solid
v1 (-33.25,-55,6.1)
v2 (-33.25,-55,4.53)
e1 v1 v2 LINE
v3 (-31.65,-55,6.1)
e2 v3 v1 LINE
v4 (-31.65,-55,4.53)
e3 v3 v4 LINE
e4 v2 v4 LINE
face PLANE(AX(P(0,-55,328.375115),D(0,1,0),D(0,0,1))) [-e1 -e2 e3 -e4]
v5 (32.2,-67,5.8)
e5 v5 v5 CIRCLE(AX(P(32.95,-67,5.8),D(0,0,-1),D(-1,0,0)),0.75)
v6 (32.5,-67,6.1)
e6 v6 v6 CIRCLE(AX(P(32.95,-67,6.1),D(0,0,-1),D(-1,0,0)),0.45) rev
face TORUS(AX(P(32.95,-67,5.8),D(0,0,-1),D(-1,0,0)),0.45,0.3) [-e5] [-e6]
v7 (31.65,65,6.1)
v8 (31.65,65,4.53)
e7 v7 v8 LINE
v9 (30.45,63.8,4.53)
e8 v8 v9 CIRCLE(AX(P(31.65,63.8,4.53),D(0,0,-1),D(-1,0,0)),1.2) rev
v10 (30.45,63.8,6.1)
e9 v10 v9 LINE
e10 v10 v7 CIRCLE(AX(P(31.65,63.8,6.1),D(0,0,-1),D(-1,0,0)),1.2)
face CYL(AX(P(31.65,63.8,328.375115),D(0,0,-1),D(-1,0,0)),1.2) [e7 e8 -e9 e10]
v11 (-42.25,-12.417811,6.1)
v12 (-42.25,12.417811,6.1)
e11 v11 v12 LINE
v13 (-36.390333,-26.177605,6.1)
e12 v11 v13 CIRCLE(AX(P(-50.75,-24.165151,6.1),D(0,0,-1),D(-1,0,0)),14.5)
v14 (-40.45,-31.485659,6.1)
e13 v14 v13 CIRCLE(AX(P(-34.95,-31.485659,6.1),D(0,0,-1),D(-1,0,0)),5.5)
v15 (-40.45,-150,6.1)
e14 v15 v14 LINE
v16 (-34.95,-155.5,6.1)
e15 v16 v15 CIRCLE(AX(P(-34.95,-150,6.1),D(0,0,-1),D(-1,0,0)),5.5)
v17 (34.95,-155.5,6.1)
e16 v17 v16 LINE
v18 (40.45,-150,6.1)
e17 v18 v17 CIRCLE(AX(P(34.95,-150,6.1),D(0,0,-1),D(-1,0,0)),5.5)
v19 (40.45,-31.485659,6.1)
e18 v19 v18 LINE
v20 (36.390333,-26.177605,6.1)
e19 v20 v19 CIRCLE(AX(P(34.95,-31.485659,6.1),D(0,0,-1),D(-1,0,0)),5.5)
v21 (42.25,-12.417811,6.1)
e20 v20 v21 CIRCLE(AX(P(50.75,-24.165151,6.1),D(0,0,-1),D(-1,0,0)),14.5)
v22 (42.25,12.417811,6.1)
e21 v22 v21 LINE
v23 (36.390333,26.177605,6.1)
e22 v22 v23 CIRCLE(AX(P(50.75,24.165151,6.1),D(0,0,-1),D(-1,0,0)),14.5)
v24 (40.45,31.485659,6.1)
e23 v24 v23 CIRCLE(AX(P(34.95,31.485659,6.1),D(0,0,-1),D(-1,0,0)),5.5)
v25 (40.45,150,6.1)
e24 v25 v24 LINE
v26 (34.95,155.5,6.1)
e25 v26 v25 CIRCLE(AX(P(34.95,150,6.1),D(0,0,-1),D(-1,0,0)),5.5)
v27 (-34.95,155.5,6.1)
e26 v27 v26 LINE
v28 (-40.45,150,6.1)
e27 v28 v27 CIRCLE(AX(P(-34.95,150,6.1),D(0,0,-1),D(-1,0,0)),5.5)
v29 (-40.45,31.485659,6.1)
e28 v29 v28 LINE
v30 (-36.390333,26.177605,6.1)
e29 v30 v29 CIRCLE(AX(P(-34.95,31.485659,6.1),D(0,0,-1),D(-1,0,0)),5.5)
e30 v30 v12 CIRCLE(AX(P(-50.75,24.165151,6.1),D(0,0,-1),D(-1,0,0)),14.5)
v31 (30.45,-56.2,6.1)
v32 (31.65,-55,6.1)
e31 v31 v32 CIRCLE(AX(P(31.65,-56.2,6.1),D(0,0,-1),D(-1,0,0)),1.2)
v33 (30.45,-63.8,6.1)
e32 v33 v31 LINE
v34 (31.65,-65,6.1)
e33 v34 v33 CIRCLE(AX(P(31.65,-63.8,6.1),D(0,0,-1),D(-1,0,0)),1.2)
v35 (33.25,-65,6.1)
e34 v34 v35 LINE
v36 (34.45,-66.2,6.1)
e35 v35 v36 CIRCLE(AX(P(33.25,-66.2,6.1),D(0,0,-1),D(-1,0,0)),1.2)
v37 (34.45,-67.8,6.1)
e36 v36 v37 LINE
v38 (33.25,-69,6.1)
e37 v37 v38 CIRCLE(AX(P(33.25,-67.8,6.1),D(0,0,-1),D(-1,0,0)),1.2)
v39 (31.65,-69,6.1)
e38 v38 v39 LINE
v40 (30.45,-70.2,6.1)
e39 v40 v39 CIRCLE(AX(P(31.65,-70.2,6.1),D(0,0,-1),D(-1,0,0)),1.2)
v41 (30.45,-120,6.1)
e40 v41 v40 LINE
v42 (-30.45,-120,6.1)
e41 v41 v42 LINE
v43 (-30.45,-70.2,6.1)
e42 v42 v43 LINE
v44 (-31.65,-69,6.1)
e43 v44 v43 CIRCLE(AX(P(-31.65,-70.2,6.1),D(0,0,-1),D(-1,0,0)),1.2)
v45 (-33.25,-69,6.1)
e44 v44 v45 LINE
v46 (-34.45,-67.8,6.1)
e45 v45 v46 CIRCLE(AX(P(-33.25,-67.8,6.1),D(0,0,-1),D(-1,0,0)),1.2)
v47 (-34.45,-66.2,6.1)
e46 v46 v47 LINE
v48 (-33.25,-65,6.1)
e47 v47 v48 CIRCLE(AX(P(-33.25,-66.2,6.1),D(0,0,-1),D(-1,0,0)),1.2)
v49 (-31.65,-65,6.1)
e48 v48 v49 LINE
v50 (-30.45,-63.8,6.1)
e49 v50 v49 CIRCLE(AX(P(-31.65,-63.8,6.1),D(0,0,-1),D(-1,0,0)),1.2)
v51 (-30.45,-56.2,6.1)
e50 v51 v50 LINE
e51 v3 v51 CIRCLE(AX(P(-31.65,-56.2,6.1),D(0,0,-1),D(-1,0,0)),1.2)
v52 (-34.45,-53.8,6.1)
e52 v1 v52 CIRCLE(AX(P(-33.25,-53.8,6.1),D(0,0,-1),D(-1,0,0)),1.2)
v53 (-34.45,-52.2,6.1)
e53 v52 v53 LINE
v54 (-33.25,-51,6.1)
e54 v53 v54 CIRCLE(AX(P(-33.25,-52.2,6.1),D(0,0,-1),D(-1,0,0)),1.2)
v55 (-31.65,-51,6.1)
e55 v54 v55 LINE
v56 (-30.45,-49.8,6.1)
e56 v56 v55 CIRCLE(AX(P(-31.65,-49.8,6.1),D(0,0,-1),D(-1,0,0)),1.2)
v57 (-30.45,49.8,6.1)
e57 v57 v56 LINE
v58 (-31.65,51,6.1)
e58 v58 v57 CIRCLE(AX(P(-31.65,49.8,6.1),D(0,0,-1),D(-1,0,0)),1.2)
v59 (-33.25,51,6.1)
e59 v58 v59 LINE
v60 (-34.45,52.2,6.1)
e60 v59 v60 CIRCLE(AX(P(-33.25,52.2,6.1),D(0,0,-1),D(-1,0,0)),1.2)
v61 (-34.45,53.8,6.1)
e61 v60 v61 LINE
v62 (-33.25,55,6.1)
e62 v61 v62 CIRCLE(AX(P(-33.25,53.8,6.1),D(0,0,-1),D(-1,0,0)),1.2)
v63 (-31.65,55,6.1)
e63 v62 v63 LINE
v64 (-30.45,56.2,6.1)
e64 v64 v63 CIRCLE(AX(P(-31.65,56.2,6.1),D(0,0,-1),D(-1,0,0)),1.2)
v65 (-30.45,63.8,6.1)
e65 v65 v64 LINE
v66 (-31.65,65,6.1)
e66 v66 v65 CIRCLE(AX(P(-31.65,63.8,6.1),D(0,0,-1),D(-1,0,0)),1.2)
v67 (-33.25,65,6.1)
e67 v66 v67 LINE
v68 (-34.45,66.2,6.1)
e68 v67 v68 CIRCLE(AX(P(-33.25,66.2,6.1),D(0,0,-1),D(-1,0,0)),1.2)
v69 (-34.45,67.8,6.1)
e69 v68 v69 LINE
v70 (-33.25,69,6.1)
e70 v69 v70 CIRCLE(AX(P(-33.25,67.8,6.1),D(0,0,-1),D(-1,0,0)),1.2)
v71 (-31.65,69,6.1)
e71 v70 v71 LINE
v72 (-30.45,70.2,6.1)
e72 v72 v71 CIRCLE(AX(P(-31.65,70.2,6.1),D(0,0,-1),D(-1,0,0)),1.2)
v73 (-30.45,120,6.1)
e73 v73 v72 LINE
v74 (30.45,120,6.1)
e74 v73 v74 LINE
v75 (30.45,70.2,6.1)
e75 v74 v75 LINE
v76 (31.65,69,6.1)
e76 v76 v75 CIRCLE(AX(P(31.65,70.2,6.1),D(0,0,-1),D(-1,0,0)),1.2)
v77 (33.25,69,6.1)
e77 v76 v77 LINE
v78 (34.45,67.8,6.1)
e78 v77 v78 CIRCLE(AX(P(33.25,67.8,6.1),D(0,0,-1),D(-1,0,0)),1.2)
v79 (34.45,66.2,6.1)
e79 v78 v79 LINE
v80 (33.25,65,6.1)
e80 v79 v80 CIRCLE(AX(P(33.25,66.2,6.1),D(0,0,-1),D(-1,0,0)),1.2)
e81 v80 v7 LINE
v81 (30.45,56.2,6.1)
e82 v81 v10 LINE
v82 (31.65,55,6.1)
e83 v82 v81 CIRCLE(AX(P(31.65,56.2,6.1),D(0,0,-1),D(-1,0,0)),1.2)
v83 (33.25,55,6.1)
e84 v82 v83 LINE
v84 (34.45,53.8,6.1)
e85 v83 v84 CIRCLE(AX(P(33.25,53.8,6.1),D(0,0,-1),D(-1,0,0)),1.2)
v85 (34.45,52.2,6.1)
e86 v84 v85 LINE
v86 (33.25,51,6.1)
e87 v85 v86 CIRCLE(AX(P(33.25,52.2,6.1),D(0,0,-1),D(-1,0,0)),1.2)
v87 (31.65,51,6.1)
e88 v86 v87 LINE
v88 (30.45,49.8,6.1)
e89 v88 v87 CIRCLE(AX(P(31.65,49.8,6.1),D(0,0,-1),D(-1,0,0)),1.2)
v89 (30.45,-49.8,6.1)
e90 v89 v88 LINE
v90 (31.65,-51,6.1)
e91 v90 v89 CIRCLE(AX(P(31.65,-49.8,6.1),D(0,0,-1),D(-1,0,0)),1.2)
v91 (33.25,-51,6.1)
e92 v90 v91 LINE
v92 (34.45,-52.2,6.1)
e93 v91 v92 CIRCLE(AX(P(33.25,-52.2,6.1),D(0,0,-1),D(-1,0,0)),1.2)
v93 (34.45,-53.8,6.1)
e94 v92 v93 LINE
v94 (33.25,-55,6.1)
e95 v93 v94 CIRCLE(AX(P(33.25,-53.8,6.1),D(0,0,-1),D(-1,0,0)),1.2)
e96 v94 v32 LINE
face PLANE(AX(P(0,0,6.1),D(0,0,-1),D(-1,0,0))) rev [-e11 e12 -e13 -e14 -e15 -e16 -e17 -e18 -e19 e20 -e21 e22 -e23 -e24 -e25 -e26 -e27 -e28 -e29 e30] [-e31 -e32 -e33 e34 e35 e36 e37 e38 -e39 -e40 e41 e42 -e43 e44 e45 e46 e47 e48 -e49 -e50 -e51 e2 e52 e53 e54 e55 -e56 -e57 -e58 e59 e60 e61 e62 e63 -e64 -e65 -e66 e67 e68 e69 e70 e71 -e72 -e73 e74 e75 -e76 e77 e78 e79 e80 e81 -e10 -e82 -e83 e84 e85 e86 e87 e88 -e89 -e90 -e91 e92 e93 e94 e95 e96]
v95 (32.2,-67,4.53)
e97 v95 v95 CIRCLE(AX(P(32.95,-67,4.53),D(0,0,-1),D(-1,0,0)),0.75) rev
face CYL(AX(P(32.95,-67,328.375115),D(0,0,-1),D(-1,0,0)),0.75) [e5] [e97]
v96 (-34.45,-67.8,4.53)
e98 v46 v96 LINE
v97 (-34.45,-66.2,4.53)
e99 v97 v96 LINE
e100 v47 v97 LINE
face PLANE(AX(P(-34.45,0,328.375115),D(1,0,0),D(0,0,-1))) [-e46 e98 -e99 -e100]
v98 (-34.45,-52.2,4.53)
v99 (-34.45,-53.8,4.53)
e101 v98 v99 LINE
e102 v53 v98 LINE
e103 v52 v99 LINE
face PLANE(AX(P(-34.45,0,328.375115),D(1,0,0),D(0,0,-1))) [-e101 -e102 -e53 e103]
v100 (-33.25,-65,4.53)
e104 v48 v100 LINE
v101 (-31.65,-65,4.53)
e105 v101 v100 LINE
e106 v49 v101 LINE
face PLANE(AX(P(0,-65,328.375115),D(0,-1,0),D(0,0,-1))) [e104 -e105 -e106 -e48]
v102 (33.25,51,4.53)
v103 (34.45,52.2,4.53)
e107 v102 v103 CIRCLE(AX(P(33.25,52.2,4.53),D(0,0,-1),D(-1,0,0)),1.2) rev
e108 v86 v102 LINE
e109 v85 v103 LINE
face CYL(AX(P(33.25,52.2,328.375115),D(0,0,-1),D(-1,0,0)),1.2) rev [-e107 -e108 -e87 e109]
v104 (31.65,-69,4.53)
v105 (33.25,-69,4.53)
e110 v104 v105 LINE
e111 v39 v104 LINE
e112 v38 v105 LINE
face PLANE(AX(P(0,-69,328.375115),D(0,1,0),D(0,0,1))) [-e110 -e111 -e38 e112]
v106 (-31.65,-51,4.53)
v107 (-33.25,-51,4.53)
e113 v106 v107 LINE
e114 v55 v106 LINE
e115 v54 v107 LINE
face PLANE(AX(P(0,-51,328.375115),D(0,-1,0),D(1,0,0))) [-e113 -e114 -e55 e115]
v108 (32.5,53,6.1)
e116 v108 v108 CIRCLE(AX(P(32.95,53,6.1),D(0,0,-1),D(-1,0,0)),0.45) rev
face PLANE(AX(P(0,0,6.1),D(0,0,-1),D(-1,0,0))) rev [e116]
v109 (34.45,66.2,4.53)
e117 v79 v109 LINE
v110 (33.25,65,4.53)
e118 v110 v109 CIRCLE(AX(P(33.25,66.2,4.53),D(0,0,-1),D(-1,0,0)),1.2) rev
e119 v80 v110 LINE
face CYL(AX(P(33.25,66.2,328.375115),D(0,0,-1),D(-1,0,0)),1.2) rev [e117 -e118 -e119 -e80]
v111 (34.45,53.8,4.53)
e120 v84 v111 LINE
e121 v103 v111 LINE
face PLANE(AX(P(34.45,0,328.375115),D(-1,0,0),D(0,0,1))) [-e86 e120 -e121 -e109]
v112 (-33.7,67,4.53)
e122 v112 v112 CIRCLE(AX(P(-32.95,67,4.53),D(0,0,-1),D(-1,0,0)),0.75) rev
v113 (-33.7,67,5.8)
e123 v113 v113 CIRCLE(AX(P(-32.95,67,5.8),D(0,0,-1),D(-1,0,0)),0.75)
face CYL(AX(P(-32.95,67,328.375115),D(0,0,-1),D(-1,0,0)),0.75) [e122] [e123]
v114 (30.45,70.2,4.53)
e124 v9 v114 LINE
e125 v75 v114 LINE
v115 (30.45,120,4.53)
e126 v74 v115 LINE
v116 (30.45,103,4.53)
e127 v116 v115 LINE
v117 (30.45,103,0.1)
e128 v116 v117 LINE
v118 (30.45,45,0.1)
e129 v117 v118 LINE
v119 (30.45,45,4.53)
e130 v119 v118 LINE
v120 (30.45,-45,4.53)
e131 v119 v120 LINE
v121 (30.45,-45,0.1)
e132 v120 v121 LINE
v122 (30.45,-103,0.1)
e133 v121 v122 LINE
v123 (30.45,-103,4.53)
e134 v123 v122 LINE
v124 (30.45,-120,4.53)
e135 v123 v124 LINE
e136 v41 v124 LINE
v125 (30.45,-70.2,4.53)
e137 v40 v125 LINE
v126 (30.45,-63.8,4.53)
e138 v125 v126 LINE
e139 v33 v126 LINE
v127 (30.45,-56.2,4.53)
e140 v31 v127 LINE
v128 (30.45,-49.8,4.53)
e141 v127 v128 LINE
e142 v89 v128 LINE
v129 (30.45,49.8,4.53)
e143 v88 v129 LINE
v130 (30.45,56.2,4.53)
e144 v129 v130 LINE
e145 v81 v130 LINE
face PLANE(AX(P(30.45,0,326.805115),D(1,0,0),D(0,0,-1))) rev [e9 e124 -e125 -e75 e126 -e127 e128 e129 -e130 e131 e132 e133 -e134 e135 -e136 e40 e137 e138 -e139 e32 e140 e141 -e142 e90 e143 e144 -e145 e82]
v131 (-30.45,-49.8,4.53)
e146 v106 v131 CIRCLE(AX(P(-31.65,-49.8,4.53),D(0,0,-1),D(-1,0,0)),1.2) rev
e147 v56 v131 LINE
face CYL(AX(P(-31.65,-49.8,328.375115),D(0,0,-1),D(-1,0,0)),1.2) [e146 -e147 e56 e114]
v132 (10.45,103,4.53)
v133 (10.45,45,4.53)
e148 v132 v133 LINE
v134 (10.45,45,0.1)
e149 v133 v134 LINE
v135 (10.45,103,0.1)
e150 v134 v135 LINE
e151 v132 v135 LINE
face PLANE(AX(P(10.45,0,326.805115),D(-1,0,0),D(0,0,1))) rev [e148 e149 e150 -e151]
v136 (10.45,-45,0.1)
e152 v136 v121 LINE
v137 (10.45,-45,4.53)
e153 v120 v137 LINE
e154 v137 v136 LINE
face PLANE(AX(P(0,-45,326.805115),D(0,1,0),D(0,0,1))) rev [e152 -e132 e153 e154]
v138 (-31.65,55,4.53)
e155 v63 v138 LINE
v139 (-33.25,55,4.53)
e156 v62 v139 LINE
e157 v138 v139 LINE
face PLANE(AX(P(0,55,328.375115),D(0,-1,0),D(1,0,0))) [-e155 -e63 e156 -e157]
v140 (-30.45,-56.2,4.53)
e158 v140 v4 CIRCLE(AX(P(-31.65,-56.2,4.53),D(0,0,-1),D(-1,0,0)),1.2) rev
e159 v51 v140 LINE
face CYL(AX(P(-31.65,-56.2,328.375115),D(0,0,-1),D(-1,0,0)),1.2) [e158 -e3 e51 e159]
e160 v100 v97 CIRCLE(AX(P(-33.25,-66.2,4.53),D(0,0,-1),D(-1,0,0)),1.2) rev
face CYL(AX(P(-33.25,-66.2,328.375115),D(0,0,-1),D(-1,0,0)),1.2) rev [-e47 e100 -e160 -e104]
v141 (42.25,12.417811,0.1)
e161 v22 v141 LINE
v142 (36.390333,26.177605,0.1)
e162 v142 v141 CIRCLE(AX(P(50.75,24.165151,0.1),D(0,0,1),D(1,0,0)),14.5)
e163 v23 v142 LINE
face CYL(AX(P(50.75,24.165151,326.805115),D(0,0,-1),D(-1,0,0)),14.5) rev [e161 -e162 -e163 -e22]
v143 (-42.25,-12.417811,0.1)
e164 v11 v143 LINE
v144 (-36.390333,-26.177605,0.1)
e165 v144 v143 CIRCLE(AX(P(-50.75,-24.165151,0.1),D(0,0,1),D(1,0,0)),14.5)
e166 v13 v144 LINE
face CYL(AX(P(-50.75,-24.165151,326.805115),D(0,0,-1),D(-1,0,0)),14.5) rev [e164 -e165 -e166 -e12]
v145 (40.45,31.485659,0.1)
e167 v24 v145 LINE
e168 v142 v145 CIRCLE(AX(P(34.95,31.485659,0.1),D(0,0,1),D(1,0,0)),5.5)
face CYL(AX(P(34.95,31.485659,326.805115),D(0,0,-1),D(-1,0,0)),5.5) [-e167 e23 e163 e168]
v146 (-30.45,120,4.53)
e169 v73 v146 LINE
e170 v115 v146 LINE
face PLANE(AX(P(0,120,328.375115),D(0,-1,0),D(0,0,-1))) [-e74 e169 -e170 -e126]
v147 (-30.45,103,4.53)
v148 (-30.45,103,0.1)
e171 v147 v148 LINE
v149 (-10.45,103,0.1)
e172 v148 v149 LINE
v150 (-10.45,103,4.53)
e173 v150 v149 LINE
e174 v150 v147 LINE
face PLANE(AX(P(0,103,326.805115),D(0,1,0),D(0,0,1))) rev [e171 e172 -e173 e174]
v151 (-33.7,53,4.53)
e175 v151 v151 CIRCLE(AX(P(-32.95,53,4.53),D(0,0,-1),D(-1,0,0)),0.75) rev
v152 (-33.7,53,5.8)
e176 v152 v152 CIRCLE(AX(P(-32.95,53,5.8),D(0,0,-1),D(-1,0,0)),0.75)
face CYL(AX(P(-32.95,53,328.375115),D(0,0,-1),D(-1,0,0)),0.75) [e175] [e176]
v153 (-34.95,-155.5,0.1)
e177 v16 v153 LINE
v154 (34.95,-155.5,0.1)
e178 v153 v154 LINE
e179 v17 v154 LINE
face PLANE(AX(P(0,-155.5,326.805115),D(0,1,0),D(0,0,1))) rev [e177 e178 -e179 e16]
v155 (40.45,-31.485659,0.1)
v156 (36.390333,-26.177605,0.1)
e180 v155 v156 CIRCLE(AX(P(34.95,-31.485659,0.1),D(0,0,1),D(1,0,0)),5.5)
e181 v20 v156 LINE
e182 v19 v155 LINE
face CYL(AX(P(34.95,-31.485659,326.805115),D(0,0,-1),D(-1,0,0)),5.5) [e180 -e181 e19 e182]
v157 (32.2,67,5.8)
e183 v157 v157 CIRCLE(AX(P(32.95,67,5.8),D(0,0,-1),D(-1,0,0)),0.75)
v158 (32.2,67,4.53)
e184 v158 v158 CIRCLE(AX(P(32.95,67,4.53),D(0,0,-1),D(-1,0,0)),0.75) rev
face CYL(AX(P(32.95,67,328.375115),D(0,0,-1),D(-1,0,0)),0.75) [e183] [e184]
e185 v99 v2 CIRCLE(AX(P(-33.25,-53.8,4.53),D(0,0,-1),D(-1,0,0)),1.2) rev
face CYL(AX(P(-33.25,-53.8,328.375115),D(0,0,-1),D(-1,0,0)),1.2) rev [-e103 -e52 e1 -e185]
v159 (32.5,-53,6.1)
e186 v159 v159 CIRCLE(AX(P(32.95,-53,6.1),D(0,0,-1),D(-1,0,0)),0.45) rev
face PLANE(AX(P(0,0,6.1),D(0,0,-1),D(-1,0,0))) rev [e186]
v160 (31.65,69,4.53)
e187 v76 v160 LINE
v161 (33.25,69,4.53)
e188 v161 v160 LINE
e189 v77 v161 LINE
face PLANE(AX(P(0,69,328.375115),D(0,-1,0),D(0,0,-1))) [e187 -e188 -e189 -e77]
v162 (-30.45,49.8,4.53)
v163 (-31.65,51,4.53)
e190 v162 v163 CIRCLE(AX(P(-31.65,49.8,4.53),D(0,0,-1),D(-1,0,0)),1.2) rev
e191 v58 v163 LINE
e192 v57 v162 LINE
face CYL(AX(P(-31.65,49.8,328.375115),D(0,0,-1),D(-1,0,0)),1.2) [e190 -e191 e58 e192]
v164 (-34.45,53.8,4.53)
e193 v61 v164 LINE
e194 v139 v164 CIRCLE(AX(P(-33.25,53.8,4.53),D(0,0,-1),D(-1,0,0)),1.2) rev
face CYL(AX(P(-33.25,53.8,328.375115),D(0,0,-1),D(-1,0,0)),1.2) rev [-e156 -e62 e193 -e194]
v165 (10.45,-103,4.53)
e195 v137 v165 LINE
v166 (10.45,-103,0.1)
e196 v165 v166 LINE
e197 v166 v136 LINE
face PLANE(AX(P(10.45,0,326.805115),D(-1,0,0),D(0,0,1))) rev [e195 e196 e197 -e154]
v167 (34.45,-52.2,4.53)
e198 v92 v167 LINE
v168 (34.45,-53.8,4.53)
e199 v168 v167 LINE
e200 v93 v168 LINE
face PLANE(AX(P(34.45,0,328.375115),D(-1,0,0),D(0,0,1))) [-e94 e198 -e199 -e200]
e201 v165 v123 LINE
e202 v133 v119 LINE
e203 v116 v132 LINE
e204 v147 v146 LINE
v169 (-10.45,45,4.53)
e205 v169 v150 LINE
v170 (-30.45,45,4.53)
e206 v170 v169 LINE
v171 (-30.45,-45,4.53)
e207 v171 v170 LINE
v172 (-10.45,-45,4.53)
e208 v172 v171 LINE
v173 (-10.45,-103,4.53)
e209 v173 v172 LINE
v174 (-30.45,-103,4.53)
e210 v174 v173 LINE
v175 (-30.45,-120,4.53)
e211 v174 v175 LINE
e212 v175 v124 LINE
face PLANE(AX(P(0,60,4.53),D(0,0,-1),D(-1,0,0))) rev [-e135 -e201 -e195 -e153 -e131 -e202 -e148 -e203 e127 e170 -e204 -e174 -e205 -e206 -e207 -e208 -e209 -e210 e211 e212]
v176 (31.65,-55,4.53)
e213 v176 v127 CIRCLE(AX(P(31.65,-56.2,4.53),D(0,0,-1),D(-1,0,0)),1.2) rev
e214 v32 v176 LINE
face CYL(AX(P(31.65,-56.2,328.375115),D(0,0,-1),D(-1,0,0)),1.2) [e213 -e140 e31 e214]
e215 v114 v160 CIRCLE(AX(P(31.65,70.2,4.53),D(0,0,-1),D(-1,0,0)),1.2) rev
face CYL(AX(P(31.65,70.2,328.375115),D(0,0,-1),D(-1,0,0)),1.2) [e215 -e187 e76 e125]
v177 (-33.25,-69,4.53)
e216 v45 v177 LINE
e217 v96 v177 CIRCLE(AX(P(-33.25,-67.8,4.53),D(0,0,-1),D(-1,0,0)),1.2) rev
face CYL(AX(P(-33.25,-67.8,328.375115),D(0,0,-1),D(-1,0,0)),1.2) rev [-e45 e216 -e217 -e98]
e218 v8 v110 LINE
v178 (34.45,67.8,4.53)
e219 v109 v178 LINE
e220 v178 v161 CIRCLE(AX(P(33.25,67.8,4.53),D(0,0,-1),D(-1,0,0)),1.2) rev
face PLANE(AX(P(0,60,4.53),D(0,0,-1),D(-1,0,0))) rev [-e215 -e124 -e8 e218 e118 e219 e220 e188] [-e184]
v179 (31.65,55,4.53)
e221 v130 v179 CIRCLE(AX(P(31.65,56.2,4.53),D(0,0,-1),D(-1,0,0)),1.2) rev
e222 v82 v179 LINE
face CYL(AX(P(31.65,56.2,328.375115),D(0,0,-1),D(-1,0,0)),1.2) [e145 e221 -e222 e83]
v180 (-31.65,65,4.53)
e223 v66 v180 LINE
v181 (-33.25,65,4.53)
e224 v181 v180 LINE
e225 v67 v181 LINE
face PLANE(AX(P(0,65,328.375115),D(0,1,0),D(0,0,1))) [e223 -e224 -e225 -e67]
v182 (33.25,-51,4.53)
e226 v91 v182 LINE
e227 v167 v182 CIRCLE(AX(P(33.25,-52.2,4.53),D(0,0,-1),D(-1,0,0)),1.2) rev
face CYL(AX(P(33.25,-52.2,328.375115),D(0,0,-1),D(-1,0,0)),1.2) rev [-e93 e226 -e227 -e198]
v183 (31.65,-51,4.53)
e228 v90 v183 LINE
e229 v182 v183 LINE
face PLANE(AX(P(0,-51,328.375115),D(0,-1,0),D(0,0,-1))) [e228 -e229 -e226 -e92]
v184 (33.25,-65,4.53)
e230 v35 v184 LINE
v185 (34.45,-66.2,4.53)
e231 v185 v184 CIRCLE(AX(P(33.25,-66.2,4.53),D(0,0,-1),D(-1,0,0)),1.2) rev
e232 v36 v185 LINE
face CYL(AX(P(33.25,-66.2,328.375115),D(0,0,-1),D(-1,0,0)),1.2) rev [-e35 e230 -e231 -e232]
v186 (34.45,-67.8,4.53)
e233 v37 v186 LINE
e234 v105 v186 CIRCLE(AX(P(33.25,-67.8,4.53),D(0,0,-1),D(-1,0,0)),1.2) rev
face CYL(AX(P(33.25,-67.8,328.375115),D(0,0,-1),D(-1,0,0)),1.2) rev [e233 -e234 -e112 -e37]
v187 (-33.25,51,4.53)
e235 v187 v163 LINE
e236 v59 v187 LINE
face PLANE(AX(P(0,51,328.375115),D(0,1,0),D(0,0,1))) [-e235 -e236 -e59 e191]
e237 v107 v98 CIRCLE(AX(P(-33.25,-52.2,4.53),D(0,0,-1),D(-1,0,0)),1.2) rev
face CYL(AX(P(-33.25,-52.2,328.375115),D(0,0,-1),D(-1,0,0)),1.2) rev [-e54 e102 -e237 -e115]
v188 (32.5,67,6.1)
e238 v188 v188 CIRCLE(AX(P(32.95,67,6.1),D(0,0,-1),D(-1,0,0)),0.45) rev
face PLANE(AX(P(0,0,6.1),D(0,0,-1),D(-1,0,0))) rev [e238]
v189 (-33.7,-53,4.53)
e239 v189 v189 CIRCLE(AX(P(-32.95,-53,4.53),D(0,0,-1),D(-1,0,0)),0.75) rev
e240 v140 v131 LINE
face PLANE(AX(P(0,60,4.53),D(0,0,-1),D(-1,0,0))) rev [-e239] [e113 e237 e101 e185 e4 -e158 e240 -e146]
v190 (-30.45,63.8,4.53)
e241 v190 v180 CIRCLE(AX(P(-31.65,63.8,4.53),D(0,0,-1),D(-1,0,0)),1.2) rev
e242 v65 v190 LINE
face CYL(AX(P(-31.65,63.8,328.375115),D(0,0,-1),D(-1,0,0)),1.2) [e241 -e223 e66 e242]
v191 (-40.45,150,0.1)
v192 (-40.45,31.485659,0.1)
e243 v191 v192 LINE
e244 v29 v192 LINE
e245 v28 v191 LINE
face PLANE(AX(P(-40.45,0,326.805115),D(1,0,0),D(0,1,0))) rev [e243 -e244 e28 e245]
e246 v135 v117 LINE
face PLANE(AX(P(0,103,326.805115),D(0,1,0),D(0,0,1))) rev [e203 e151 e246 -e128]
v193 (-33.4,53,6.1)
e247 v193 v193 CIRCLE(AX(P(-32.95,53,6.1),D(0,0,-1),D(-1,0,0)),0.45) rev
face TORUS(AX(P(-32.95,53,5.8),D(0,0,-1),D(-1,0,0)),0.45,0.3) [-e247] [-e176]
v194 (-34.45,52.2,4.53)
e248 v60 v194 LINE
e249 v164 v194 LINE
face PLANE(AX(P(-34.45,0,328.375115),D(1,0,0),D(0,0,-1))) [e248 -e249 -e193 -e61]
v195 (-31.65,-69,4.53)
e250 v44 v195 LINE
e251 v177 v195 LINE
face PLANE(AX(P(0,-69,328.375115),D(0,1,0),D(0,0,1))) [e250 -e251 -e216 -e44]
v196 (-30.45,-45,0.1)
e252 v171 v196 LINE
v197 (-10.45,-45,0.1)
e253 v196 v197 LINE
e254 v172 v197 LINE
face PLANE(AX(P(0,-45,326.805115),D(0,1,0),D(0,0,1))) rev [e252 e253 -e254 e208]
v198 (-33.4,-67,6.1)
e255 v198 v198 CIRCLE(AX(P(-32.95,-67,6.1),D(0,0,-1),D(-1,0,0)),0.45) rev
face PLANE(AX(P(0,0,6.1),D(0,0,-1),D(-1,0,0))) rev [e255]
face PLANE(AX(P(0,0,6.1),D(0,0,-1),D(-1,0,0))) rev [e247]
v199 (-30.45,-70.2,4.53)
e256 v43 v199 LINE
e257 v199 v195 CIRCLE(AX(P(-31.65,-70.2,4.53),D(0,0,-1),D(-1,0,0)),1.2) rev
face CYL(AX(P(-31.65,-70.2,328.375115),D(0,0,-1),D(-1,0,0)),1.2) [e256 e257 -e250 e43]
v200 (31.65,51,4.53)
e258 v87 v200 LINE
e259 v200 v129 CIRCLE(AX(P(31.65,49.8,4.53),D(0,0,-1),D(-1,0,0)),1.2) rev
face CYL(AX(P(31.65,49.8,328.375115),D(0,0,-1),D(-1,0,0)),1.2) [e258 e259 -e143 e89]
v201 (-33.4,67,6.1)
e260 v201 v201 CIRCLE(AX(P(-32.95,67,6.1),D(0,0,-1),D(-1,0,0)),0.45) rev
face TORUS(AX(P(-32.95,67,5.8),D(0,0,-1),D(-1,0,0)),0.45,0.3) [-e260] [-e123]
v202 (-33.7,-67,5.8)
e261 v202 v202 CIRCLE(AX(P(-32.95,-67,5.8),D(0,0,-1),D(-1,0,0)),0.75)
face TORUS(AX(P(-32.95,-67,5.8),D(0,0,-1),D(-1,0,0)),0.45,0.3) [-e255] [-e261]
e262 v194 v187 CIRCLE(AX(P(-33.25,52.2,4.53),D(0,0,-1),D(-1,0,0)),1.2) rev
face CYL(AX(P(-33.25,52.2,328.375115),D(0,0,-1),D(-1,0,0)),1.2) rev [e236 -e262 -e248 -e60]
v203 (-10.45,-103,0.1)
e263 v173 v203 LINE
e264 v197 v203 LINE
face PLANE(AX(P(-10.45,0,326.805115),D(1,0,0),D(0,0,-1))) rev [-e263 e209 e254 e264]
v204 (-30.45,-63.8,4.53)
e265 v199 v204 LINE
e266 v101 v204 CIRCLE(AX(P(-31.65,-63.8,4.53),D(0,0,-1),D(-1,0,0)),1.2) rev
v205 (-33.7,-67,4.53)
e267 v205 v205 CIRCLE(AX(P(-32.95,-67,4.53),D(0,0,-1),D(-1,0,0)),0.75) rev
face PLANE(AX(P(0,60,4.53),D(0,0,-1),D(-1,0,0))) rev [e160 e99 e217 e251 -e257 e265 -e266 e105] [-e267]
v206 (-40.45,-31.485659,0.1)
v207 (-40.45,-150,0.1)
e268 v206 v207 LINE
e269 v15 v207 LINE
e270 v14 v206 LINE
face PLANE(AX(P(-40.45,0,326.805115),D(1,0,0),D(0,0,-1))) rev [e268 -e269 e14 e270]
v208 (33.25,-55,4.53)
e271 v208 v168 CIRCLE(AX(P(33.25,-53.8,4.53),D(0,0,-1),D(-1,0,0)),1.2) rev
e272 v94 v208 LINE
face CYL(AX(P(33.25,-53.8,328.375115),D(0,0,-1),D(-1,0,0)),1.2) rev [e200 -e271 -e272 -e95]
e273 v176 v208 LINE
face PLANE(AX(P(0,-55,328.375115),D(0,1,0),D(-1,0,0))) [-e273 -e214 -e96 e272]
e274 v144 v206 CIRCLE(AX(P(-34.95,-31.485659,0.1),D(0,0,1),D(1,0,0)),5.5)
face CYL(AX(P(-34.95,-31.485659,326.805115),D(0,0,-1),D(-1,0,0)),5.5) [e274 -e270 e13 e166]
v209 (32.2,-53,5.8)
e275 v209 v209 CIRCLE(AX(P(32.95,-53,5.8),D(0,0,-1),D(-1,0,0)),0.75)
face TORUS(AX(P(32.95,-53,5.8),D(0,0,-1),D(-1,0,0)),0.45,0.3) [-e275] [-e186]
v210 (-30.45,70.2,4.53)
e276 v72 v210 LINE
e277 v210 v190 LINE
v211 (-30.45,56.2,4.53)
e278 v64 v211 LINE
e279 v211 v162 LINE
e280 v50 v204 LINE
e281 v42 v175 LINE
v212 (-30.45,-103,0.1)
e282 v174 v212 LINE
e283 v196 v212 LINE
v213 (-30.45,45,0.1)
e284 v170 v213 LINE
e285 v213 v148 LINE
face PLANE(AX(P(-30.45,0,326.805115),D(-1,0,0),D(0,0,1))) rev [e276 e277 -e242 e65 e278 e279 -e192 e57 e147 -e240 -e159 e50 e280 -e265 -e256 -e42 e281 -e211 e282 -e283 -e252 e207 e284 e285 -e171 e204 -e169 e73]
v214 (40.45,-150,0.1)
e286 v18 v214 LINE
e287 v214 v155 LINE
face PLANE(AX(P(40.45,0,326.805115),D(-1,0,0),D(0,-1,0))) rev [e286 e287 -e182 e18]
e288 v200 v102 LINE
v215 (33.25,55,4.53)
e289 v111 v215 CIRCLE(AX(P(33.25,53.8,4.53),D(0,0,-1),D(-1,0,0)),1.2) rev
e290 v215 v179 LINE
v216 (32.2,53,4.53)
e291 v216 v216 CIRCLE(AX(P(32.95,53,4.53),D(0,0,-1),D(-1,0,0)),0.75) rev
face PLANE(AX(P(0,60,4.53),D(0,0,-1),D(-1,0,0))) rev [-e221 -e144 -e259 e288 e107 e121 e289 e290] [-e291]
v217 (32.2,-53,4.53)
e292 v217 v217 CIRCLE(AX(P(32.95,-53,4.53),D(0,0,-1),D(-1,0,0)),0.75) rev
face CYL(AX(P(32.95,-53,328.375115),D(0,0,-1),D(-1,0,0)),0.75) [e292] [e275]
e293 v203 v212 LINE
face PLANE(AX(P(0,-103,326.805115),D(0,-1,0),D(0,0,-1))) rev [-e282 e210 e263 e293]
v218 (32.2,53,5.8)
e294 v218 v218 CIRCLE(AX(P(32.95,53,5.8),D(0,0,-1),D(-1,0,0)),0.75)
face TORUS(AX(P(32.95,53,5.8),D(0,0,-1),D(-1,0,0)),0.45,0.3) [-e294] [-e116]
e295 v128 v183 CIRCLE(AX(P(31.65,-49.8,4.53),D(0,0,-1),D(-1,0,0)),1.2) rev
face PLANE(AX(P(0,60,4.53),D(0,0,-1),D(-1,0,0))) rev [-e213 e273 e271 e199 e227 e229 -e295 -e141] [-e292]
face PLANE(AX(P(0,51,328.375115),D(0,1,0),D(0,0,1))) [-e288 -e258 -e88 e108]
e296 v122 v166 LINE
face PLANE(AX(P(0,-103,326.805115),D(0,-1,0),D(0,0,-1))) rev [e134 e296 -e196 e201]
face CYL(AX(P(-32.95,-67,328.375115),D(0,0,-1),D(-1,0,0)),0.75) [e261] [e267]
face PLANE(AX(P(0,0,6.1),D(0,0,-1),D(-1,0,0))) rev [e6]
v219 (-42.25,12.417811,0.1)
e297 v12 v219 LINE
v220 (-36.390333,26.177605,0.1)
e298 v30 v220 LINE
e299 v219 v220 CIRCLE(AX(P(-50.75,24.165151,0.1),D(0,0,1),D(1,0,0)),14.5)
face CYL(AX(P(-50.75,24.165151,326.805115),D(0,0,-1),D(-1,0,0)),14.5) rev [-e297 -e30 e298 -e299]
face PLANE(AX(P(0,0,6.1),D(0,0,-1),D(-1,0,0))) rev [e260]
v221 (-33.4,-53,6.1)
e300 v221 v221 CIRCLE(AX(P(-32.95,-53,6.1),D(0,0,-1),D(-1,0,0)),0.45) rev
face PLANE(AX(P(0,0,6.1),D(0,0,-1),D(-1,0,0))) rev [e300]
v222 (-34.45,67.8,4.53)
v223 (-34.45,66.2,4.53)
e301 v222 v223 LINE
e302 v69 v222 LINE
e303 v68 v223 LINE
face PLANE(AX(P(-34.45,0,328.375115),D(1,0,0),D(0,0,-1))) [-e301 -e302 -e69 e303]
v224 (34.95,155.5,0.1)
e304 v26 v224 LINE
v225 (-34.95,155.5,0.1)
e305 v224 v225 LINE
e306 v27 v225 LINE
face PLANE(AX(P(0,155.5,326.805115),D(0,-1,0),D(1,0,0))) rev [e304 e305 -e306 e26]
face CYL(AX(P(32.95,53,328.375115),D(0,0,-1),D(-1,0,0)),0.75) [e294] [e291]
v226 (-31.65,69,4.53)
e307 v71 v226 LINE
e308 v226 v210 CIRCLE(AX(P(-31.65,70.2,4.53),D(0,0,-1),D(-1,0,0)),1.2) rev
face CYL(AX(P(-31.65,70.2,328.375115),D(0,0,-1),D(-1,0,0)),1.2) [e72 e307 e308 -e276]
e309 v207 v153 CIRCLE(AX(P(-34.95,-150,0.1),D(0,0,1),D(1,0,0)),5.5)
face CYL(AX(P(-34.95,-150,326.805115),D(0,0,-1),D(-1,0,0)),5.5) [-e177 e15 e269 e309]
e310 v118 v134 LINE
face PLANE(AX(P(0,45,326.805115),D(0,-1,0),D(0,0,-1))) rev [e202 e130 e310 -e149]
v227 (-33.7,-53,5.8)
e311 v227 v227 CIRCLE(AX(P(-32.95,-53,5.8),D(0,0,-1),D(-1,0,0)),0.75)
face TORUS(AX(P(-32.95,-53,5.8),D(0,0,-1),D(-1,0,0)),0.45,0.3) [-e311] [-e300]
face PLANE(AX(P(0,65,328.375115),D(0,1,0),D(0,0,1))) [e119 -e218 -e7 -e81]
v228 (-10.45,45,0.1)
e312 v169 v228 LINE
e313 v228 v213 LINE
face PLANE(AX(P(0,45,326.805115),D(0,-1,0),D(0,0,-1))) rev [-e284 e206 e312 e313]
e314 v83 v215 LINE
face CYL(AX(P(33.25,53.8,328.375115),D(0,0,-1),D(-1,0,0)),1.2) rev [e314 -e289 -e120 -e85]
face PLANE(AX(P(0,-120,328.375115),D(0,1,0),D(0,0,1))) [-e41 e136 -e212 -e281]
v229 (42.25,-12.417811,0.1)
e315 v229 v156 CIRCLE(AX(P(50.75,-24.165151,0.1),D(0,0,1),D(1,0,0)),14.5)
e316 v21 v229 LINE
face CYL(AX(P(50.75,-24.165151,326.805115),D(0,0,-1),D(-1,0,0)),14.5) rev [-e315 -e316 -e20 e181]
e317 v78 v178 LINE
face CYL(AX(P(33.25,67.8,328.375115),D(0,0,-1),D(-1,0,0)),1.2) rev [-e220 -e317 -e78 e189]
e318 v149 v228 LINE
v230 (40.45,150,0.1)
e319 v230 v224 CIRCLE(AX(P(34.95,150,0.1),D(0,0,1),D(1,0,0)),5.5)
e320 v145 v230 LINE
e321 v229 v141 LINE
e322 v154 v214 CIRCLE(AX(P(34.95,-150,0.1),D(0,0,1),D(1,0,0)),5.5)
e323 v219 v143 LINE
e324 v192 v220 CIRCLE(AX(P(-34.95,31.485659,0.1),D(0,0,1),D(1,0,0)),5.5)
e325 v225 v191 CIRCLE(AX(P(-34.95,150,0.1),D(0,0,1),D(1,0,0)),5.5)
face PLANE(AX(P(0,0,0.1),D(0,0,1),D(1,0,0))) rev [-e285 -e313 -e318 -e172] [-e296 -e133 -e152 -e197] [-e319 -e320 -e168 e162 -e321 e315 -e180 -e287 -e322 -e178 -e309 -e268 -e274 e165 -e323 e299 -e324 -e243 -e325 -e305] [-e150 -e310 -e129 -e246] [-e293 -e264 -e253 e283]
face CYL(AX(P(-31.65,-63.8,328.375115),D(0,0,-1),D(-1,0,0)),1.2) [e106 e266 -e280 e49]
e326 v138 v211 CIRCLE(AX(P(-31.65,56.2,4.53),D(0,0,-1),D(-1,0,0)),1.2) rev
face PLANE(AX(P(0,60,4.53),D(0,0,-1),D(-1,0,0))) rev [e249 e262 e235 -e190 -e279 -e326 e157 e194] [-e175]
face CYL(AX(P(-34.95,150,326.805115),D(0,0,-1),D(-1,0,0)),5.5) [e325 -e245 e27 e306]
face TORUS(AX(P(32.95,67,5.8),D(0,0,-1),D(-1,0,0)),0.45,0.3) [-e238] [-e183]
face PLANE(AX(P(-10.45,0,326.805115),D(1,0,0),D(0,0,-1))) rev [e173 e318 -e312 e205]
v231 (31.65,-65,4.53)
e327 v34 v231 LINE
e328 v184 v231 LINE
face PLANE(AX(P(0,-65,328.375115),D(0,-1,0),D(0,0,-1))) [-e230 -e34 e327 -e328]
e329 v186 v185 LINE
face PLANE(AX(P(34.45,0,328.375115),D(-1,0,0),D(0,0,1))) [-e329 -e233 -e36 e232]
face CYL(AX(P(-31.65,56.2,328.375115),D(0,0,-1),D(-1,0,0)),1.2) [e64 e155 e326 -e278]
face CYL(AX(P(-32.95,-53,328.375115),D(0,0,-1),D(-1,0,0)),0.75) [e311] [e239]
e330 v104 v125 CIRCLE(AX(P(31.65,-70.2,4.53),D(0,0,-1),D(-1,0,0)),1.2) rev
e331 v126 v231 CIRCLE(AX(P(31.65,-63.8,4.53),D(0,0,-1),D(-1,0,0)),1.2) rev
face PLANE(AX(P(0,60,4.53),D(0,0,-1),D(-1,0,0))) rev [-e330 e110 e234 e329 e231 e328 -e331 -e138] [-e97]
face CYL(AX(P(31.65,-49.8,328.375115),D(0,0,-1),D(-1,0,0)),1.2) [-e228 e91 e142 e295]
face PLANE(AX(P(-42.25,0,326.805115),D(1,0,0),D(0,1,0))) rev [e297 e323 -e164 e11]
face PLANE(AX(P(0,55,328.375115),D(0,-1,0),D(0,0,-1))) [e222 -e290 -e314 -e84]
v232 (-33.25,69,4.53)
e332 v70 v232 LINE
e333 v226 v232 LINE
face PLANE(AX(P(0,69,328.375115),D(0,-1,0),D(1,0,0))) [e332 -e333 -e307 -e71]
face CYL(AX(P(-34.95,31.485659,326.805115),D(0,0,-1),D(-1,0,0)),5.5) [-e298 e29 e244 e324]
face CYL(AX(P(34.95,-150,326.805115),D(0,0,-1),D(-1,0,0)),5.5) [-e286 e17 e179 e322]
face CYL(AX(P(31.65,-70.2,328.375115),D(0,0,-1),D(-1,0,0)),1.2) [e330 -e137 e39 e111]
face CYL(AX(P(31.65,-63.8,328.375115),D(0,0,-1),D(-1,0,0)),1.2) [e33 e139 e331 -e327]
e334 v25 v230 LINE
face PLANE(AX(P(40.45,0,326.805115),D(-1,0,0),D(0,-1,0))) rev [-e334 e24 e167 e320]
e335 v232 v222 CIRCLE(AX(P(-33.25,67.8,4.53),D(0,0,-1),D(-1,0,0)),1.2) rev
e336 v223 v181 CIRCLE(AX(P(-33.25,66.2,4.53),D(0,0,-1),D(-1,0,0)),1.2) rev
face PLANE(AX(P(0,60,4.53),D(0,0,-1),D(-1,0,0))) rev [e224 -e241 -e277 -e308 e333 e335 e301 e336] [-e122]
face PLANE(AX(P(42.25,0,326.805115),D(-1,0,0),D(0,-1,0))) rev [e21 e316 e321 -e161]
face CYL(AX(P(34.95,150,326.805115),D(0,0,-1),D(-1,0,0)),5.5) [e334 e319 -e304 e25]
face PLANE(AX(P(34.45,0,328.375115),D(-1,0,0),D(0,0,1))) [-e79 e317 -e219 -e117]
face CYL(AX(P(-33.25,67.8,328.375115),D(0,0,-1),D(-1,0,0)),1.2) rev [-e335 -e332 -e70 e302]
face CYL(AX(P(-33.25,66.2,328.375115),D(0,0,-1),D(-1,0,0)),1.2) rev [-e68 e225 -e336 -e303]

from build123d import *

# Parameters (mm, degrees)
BOSS_EXTRUDE1_OUTLINE_W = 20
BOSS_EXTRUDE1_OUTLINE_H = 58
BOSS_EXTRUDE1_DEPTH     = 4.43
SKETCH1_3_R             = 0.75
BOSS_EXTRUDE2_DEPTH     = 6
FILLET1_R               = 0.3


# Read off the part's stored shape, not the designer's step: Boss-Extrude1
with BuildPart() as part:
    # Boss-Extrude1 outline → Boss-Extrude1 (new body)
    with BuildSketch(Plane.XY.offset(0.1)):
        with BuildLine():
            ThreePointArc((-40.45, 31.485659466), (-39.318743113, 28.144389705), (-36.390333232, 26.177605191))
            ThreePointArc((-36.390333232, 26.177605191), (-37.409307611, 18.483960793), (-42.25, 12.417811265))
            Line((-42.25, 12.417811265), (-42.25, -12.417811265))
            ThreePointArc((-42.25, -12.417811265), (-37.409307611, -18.483960793), (-36.390333232, -26.177605191))
            ThreePointArc((-36.390333232, -26.177605191), (-39.318743113, -28.144389705), (-40.45, -31.485659466))
            Line((-40.45, -31.485659466), (-40.45, -150))
            ThreePointArc((-40.45, -150), (-38.839087297, -153.889087297), (-34.95, -155.5))
            Line((-34.95, -155.5), (34.95, -155.5))
            ThreePointArc((34.95, -155.5), (38.839087297, -153.889087297), (40.45, -150))
            Line((40.45, -150), (40.45, -31.485659466))
            ThreePointArc((40.45, -31.485659466), (39.318743113, -28.144389705), (36.390333232, -26.177605191))
            ThreePointArc((36.390333232, -26.177605191), (37.409307611, -18.483960793), (42.25, -12.417811265))
            Line((42.25, -12.417811265), (42.25, 12.417811265))
            ThreePointArc((42.25, 12.417811265), (37.409307611, 18.483960793), (36.390333232, 26.177605191))
            ThreePointArc((36.390333232, 26.177605191), (39.318743113, 28.144389705), (40.45, 31.485659466))
            Line((40.45, 31.485659466), (40.45, 150))
            ThreePointArc((40.45, 150), (38.839087297, 153.889087297), (34.95, 155.5))
            Line((34.95, 155.5), (-34.95, 155.5))
            ThreePointArc((-34.95, 155.5), (-38.839087297, 153.889087297), (-40.45, 150))
            Line((-40.45, 150), (-40.45, 31.485659466))
        make_face()
        with Locations((-20.45, -74)):
            Rectangle(BOSS_EXTRUDE1_OUTLINE_W, BOSS_EXTRUDE1_OUTLINE_H, mode=Mode.SUBTRACT)
        with Locations((20.45, -74)):
            Rectangle(BOSS_EXTRUDE1_OUTLINE_W, BOSS_EXTRUDE1_OUTLINE_H, mode=Mode.SUBTRACT)
        with Locations((-20.45, 74)):
            Rectangle(BOSS_EXTRUDE1_OUTLINE_W, BOSS_EXTRUDE1_OUTLINE_H, mode=Mode.SUBTRACT)
        with Locations((20.45, 74)):
            Rectangle(BOSS_EXTRUDE1_OUTLINE_W, BOSS_EXTRUDE1_OUTLINE_H, mode=Mode.SUBTRACT)
    extrude(amount=BOSS_EXTRUDE1_DEPTH)

    # Sketch1<3> → Boss-Extrude2 (add)
    # profile 1 of 9: a face of its own
    with BuildSketch(Plane.XY.offset(0.1)):
        with BuildLine():
            ThreePointArc((36.390333232, 26.177605191), (39.318743113, 28.144389705), (40.45, 31.485659466))
            Line((40.45, 31.485659466), (40.45, 150))
            ThreePointArc((40.45, 150), (38.839087297, 153.889087297), (34.95, 155.5))
            Line((34.95, 155.5), (-34.95, 155.5))
            ThreePointArc((-34.95, 155.5), (-38.839087297, 153.889087297), (-40.45, 150))
            Line((-40.45, 150), (-40.45, 31.485659466))
            ThreePointArc((-40.45, 31.485659466), (-39.318743113, 28.144389705), (-36.390333232, 26.177605191))
            ThreePointArc((-36.390333232, 26.177605191), (-37.409307611, 18.483960794), (-42.25, 12.417811265))
            Line((-42.25, 12.417811265), (-42.25, -12.417811265))
            ThreePointArc((-42.25, -12.417811265), (-37.409307611, -18.483960794), (-36.390333232, -26.177605191))
            ThreePointArc((-36.390333232, -26.177605191), (-39.318743113, -28.144389705), (-40.45, -31.485659466))
            Line((-40.45, -31.485659466), (-40.45, -150))
            ThreePointArc((-40.45, -150), (-38.839087297, -153.889087297), (-34.95, -155.5))
            Line((-34.95, -155.5), (34.95, -155.5))
            ThreePointArc((34.95, -155.5), (38.839087297, -153.889087297), (40.45, -150))
            Line((40.45, -150), (40.45, -31.485659466))
            ThreePointArc((40.45, -31.485659466), (39.318743113, -28.144389705), (36.390333232, -26.177605191))
            ThreePointArc((36.390333232, -26.177605191), (37.409307611, -18.483960794), (42.25, -12.417811265))
            Line((42.25, -12.417811265), (42.25, 12.417811265))
            ThreePointArc((42.25, 12.417811265), (37.409307611, 18.483960794), (36.390333232, 26.177605191))
        make_face()
        with BuildLine():
            Line((-30.45, 70.2), (-30.45, 120))
            Line((-30.45, 120), (30.45, 120))
            Line((30.45, 120), (30.45, 70.2))
            ThreePointArc((30.45, 70.2), (30.801471863, 69.351471863), (31.65, 69))
            Line((31.65, 69), (33.25, 69))
            ThreePointArc((33.25, 69), (34.098528137, 68.648528137), (34.45, 67.8))
            Line((34.45, 67.8), (34.45, 66.2))
            ThreePointArc((34.45, 66.2), (34.098528137, 65.351471863), (33.25, 65))
            Line((33.25, 65), (31.65, 65))
            ThreePointArc((31.65, 65), (30.801471863, 64.648528137), (30.45, 63.8))
            Line((30.45, 63.8), (30.45, 56.2))
            ThreePointArc((30.45, 56.2), (30.801471863, 55.351471863), (31.65, 55))
            Line((31.65, 55), (33.25, 55))
            ThreePointArc((33.25, 55), (34.098528137, 54.648528137), (34.45, 53.8))
            Line((34.45, 53.8), (34.45, 52.2))
            ThreePointArc((34.45, 52.2), (34.098528137, 51.351471863), (33.25, 51))
            Line((33.25, 51), (31.65, 51))
            ThreePointArc((31.65, 51), (30.801471863, 50.648528137), (30.45, 49.8))
            Line((30.45, 49.8), (30.45, 0))
            Line((30.45, 0), (30.45, -49.8))
            ThreePointArc((30.45, -49.8), (30.801471863, -50.648528137), (31.65, -51))
            Line((31.65, -51), (33.25, -51))
            ThreePointArc((33.25, -51), (34.098528137, -51.351471863), (34.45, -52.2))
            Line((34.45, -52.2), (34.45, -53.8))
            ThreePointArc((34.45, -53.8), (34.098528137, -54.648528137), (33.25, -55))
            Line((33.25, -55), (31.65, -55))
            ThreePointArc((31.65, -55), (30.801471863, -55.351471863), (30.45, -56.2))
            Line((30.45, -56.2), (30.45, -63.8))
            ThreePointArc((30.45, -63.8), (30.801471863, -64.648528137), (31.65, -65))
            Line((31.65, -65), (33.25, -65))
            ThreePointArc((33.25, -65), (34.098528137, -65.351471863), (34.45, -66.2))
            Line((34.45, -66.2), (34.45, -67.8))
            ThreePointArc((34.45, -67.8), (34.098528137, -68.648528137), (33.25, -69))
            Line((33.25, -69), (31.65, -69))
            ThreePointArc((31.65, -69), (30.801471863, -69.351471863), (30.45, -70.2))
            Line((30.45, -70.2), (30.45, -120))
            Line((30.45, -120), (-30.45, -120))
            Line((-30.45, -120), (-30.45, -70.2))
            ThreePointArc((-30.45, -70.2), (-30.801471863, -69.351471863), (-31.65, -69))
            Line((-31.65, -69), (-33.25, -69))
            ThreePointArc((-33.25, -69), (-34.098528137, -68.648528137), (-34.45, -67.8))
            Line((-34.45, -67.8), (-34.45, -66.2))
            ThreePointArc((-34.45, -66.2), (-34.098528137, -65.351471863), (-33.25, -65))
            Line((-33.25, -65), (-31.65, -65))
            ThreePointArc((-31.65, -65), (-30.801471863, -64.648528137), (-30.45, -63.8))
            Line((-30.45, -63.8), (-30.45, -56.2))
            ThreePointArc((-30.45, -56.2), (-30.801471863, -55.351471863), (-31.65, -55))
            Line((-31.65, -55), (-33.25, -55))
            ThreePointArc((-33.25, -55), (-34.098528137, -54.648528137), (-34.45, -53.8))
            Line((-34.45, -53.8), (-34.45, -52.2))
            ThreePointArc((-34.45, -52.2), (-34.098528137, -51.351471863), (-33.25, -51))
            Line((-33.25, -51), (-31.65, -51))
            ThreePointArc((-31.65, -51), (-30.801471863, -50.648528137), (-30.45, -49.8))
            Line((-30.45, -49.8), (-30.45, 0))
            Line((-30.45, 0), (-30.45, 49.8))
            ThreePointArc((-30.45, 49.8), (-30.801471863, 50.648528137), (-31.65, 51))
            Line((-31.65, 51), (-33.25, 51))
            ThreePointArc((-33.25, 51), (-34.098528137, 51.351471863), (-34.45, 52.2))
            Line((-34.45, 52.2), (-34.45, 53.8))
            ThreePointArc((-34.45, 53.8), (-34.098528137, 54.648528137), (-33.25, 55))
            Line((-33.25, 55), (-31.65, 55))
            ThreePointArc((-31.65, 55), (-30.801471863, 55.351471863), (-30.45, 56.2))
            Line((-30.45, 56.2), (-30.45, 63.8))
            ThreePointArc((-30.45, 63.8), (-30.801471863, 64.648528137), (-31.65, 65))
            Line((-31.65, 65), (-33.25, 65))
            ThreePointArc((-33.25, 65), (-34.098528137, 65.351471863), (-34.45, 66.2))
            Line((-34.45, 66.2), (-34.45, 67.8))
            ThreePointArc((-34.45, 67.8), (-34.098528137, 68.648528137), (-33.25, 69))
            Line((-33.25, 69), (-31.65, 69))
            ThreePointArc((-31.65, 69), (-30.801471863, 69.351471863), (-30.45, 70.2))
        make_face(mode=Mode.SUBTRACT)
    # profile 2 of 9: a face of its own
    with BuildSketch(Plane.XY.offset(0.1)):
        with Locations(Location((-32.95, -67, 0), (0, 0, 180))):
            Circle(SKETCH1_3_R)
    # profile 3 of 9: a face of its own
    with BuildSketch(Plane.XY.offset(0.1)):
        with Locations(Location((-32.95, -53, 0), (0, 0, 180))):
            Circle(SKETCH1_3_R)
    # profile 4 of 9: a face of its own
    with BuildSketch(Plane.XY.offset(0.1)):
        with Locations(Location((32.95, -67, 0), (0, 0, 180))):
            Circle(SKETCH1_3_R)
    # profile 5 of 9: a face of its own
    with BuildSketch(Plane.XY.offset(0.1)):
        with Locations(Location((32.95, -53, 0), (0, 0, 180))):
            Circle(SKETCH1_3_R)
    # profile 6 of 9: a face of its own
    with BuildSketch(Plane.XY.offset(0.1)):
        with Locations(Location((32.95, 53, 0), (0, 0, 180))):
            Circle(SKETCH1_3_R)
    # profile 7 of 9: a face of its own
    with BuildSketch(Plane.XY.offset(0.1)):
        with Locations(Location((32.95, 67, 0), (0, 0, 180))):
            Circle(SKETCH1_3_R)
    # profile 8 of 9: a face of its own
    with BuildSketch(Plane.XY.offset(0.1)):
        with Locations(Location((-32.95, 53, 0), (0, 0, 180))):
            Circle(SKETCH1_3_R)
    # profile 9 of 9: a face of its own
    with BuildSketch(Plane.XY.offset(0.1)):
        with Locations(Location((-32.95, 67, 0), (0, 0, 180))):
            Circle(SKETCH1_3_R)
    extrude(amount=BOSS_EXTRUDE2_DEPTH)

    # Fillet1
    fillet1_edges = [part.edges().sort_by_distance(p)[0] for p in [
        (-32.2, 67, 6.1),
        (-32.2, 53, 6.1),
        (33.7, 67, 6.1),
        (33.7, 53, 6.1),
        (-32.2, -53, 6.1),
        (-32.2, -67, 6.1),
        (33.7, -53, 6.1),
        (33.7, -67, 6.1),
    ]]
    fillet(fillet1_edges, radius=FILLET1_R)


solid = part.part
